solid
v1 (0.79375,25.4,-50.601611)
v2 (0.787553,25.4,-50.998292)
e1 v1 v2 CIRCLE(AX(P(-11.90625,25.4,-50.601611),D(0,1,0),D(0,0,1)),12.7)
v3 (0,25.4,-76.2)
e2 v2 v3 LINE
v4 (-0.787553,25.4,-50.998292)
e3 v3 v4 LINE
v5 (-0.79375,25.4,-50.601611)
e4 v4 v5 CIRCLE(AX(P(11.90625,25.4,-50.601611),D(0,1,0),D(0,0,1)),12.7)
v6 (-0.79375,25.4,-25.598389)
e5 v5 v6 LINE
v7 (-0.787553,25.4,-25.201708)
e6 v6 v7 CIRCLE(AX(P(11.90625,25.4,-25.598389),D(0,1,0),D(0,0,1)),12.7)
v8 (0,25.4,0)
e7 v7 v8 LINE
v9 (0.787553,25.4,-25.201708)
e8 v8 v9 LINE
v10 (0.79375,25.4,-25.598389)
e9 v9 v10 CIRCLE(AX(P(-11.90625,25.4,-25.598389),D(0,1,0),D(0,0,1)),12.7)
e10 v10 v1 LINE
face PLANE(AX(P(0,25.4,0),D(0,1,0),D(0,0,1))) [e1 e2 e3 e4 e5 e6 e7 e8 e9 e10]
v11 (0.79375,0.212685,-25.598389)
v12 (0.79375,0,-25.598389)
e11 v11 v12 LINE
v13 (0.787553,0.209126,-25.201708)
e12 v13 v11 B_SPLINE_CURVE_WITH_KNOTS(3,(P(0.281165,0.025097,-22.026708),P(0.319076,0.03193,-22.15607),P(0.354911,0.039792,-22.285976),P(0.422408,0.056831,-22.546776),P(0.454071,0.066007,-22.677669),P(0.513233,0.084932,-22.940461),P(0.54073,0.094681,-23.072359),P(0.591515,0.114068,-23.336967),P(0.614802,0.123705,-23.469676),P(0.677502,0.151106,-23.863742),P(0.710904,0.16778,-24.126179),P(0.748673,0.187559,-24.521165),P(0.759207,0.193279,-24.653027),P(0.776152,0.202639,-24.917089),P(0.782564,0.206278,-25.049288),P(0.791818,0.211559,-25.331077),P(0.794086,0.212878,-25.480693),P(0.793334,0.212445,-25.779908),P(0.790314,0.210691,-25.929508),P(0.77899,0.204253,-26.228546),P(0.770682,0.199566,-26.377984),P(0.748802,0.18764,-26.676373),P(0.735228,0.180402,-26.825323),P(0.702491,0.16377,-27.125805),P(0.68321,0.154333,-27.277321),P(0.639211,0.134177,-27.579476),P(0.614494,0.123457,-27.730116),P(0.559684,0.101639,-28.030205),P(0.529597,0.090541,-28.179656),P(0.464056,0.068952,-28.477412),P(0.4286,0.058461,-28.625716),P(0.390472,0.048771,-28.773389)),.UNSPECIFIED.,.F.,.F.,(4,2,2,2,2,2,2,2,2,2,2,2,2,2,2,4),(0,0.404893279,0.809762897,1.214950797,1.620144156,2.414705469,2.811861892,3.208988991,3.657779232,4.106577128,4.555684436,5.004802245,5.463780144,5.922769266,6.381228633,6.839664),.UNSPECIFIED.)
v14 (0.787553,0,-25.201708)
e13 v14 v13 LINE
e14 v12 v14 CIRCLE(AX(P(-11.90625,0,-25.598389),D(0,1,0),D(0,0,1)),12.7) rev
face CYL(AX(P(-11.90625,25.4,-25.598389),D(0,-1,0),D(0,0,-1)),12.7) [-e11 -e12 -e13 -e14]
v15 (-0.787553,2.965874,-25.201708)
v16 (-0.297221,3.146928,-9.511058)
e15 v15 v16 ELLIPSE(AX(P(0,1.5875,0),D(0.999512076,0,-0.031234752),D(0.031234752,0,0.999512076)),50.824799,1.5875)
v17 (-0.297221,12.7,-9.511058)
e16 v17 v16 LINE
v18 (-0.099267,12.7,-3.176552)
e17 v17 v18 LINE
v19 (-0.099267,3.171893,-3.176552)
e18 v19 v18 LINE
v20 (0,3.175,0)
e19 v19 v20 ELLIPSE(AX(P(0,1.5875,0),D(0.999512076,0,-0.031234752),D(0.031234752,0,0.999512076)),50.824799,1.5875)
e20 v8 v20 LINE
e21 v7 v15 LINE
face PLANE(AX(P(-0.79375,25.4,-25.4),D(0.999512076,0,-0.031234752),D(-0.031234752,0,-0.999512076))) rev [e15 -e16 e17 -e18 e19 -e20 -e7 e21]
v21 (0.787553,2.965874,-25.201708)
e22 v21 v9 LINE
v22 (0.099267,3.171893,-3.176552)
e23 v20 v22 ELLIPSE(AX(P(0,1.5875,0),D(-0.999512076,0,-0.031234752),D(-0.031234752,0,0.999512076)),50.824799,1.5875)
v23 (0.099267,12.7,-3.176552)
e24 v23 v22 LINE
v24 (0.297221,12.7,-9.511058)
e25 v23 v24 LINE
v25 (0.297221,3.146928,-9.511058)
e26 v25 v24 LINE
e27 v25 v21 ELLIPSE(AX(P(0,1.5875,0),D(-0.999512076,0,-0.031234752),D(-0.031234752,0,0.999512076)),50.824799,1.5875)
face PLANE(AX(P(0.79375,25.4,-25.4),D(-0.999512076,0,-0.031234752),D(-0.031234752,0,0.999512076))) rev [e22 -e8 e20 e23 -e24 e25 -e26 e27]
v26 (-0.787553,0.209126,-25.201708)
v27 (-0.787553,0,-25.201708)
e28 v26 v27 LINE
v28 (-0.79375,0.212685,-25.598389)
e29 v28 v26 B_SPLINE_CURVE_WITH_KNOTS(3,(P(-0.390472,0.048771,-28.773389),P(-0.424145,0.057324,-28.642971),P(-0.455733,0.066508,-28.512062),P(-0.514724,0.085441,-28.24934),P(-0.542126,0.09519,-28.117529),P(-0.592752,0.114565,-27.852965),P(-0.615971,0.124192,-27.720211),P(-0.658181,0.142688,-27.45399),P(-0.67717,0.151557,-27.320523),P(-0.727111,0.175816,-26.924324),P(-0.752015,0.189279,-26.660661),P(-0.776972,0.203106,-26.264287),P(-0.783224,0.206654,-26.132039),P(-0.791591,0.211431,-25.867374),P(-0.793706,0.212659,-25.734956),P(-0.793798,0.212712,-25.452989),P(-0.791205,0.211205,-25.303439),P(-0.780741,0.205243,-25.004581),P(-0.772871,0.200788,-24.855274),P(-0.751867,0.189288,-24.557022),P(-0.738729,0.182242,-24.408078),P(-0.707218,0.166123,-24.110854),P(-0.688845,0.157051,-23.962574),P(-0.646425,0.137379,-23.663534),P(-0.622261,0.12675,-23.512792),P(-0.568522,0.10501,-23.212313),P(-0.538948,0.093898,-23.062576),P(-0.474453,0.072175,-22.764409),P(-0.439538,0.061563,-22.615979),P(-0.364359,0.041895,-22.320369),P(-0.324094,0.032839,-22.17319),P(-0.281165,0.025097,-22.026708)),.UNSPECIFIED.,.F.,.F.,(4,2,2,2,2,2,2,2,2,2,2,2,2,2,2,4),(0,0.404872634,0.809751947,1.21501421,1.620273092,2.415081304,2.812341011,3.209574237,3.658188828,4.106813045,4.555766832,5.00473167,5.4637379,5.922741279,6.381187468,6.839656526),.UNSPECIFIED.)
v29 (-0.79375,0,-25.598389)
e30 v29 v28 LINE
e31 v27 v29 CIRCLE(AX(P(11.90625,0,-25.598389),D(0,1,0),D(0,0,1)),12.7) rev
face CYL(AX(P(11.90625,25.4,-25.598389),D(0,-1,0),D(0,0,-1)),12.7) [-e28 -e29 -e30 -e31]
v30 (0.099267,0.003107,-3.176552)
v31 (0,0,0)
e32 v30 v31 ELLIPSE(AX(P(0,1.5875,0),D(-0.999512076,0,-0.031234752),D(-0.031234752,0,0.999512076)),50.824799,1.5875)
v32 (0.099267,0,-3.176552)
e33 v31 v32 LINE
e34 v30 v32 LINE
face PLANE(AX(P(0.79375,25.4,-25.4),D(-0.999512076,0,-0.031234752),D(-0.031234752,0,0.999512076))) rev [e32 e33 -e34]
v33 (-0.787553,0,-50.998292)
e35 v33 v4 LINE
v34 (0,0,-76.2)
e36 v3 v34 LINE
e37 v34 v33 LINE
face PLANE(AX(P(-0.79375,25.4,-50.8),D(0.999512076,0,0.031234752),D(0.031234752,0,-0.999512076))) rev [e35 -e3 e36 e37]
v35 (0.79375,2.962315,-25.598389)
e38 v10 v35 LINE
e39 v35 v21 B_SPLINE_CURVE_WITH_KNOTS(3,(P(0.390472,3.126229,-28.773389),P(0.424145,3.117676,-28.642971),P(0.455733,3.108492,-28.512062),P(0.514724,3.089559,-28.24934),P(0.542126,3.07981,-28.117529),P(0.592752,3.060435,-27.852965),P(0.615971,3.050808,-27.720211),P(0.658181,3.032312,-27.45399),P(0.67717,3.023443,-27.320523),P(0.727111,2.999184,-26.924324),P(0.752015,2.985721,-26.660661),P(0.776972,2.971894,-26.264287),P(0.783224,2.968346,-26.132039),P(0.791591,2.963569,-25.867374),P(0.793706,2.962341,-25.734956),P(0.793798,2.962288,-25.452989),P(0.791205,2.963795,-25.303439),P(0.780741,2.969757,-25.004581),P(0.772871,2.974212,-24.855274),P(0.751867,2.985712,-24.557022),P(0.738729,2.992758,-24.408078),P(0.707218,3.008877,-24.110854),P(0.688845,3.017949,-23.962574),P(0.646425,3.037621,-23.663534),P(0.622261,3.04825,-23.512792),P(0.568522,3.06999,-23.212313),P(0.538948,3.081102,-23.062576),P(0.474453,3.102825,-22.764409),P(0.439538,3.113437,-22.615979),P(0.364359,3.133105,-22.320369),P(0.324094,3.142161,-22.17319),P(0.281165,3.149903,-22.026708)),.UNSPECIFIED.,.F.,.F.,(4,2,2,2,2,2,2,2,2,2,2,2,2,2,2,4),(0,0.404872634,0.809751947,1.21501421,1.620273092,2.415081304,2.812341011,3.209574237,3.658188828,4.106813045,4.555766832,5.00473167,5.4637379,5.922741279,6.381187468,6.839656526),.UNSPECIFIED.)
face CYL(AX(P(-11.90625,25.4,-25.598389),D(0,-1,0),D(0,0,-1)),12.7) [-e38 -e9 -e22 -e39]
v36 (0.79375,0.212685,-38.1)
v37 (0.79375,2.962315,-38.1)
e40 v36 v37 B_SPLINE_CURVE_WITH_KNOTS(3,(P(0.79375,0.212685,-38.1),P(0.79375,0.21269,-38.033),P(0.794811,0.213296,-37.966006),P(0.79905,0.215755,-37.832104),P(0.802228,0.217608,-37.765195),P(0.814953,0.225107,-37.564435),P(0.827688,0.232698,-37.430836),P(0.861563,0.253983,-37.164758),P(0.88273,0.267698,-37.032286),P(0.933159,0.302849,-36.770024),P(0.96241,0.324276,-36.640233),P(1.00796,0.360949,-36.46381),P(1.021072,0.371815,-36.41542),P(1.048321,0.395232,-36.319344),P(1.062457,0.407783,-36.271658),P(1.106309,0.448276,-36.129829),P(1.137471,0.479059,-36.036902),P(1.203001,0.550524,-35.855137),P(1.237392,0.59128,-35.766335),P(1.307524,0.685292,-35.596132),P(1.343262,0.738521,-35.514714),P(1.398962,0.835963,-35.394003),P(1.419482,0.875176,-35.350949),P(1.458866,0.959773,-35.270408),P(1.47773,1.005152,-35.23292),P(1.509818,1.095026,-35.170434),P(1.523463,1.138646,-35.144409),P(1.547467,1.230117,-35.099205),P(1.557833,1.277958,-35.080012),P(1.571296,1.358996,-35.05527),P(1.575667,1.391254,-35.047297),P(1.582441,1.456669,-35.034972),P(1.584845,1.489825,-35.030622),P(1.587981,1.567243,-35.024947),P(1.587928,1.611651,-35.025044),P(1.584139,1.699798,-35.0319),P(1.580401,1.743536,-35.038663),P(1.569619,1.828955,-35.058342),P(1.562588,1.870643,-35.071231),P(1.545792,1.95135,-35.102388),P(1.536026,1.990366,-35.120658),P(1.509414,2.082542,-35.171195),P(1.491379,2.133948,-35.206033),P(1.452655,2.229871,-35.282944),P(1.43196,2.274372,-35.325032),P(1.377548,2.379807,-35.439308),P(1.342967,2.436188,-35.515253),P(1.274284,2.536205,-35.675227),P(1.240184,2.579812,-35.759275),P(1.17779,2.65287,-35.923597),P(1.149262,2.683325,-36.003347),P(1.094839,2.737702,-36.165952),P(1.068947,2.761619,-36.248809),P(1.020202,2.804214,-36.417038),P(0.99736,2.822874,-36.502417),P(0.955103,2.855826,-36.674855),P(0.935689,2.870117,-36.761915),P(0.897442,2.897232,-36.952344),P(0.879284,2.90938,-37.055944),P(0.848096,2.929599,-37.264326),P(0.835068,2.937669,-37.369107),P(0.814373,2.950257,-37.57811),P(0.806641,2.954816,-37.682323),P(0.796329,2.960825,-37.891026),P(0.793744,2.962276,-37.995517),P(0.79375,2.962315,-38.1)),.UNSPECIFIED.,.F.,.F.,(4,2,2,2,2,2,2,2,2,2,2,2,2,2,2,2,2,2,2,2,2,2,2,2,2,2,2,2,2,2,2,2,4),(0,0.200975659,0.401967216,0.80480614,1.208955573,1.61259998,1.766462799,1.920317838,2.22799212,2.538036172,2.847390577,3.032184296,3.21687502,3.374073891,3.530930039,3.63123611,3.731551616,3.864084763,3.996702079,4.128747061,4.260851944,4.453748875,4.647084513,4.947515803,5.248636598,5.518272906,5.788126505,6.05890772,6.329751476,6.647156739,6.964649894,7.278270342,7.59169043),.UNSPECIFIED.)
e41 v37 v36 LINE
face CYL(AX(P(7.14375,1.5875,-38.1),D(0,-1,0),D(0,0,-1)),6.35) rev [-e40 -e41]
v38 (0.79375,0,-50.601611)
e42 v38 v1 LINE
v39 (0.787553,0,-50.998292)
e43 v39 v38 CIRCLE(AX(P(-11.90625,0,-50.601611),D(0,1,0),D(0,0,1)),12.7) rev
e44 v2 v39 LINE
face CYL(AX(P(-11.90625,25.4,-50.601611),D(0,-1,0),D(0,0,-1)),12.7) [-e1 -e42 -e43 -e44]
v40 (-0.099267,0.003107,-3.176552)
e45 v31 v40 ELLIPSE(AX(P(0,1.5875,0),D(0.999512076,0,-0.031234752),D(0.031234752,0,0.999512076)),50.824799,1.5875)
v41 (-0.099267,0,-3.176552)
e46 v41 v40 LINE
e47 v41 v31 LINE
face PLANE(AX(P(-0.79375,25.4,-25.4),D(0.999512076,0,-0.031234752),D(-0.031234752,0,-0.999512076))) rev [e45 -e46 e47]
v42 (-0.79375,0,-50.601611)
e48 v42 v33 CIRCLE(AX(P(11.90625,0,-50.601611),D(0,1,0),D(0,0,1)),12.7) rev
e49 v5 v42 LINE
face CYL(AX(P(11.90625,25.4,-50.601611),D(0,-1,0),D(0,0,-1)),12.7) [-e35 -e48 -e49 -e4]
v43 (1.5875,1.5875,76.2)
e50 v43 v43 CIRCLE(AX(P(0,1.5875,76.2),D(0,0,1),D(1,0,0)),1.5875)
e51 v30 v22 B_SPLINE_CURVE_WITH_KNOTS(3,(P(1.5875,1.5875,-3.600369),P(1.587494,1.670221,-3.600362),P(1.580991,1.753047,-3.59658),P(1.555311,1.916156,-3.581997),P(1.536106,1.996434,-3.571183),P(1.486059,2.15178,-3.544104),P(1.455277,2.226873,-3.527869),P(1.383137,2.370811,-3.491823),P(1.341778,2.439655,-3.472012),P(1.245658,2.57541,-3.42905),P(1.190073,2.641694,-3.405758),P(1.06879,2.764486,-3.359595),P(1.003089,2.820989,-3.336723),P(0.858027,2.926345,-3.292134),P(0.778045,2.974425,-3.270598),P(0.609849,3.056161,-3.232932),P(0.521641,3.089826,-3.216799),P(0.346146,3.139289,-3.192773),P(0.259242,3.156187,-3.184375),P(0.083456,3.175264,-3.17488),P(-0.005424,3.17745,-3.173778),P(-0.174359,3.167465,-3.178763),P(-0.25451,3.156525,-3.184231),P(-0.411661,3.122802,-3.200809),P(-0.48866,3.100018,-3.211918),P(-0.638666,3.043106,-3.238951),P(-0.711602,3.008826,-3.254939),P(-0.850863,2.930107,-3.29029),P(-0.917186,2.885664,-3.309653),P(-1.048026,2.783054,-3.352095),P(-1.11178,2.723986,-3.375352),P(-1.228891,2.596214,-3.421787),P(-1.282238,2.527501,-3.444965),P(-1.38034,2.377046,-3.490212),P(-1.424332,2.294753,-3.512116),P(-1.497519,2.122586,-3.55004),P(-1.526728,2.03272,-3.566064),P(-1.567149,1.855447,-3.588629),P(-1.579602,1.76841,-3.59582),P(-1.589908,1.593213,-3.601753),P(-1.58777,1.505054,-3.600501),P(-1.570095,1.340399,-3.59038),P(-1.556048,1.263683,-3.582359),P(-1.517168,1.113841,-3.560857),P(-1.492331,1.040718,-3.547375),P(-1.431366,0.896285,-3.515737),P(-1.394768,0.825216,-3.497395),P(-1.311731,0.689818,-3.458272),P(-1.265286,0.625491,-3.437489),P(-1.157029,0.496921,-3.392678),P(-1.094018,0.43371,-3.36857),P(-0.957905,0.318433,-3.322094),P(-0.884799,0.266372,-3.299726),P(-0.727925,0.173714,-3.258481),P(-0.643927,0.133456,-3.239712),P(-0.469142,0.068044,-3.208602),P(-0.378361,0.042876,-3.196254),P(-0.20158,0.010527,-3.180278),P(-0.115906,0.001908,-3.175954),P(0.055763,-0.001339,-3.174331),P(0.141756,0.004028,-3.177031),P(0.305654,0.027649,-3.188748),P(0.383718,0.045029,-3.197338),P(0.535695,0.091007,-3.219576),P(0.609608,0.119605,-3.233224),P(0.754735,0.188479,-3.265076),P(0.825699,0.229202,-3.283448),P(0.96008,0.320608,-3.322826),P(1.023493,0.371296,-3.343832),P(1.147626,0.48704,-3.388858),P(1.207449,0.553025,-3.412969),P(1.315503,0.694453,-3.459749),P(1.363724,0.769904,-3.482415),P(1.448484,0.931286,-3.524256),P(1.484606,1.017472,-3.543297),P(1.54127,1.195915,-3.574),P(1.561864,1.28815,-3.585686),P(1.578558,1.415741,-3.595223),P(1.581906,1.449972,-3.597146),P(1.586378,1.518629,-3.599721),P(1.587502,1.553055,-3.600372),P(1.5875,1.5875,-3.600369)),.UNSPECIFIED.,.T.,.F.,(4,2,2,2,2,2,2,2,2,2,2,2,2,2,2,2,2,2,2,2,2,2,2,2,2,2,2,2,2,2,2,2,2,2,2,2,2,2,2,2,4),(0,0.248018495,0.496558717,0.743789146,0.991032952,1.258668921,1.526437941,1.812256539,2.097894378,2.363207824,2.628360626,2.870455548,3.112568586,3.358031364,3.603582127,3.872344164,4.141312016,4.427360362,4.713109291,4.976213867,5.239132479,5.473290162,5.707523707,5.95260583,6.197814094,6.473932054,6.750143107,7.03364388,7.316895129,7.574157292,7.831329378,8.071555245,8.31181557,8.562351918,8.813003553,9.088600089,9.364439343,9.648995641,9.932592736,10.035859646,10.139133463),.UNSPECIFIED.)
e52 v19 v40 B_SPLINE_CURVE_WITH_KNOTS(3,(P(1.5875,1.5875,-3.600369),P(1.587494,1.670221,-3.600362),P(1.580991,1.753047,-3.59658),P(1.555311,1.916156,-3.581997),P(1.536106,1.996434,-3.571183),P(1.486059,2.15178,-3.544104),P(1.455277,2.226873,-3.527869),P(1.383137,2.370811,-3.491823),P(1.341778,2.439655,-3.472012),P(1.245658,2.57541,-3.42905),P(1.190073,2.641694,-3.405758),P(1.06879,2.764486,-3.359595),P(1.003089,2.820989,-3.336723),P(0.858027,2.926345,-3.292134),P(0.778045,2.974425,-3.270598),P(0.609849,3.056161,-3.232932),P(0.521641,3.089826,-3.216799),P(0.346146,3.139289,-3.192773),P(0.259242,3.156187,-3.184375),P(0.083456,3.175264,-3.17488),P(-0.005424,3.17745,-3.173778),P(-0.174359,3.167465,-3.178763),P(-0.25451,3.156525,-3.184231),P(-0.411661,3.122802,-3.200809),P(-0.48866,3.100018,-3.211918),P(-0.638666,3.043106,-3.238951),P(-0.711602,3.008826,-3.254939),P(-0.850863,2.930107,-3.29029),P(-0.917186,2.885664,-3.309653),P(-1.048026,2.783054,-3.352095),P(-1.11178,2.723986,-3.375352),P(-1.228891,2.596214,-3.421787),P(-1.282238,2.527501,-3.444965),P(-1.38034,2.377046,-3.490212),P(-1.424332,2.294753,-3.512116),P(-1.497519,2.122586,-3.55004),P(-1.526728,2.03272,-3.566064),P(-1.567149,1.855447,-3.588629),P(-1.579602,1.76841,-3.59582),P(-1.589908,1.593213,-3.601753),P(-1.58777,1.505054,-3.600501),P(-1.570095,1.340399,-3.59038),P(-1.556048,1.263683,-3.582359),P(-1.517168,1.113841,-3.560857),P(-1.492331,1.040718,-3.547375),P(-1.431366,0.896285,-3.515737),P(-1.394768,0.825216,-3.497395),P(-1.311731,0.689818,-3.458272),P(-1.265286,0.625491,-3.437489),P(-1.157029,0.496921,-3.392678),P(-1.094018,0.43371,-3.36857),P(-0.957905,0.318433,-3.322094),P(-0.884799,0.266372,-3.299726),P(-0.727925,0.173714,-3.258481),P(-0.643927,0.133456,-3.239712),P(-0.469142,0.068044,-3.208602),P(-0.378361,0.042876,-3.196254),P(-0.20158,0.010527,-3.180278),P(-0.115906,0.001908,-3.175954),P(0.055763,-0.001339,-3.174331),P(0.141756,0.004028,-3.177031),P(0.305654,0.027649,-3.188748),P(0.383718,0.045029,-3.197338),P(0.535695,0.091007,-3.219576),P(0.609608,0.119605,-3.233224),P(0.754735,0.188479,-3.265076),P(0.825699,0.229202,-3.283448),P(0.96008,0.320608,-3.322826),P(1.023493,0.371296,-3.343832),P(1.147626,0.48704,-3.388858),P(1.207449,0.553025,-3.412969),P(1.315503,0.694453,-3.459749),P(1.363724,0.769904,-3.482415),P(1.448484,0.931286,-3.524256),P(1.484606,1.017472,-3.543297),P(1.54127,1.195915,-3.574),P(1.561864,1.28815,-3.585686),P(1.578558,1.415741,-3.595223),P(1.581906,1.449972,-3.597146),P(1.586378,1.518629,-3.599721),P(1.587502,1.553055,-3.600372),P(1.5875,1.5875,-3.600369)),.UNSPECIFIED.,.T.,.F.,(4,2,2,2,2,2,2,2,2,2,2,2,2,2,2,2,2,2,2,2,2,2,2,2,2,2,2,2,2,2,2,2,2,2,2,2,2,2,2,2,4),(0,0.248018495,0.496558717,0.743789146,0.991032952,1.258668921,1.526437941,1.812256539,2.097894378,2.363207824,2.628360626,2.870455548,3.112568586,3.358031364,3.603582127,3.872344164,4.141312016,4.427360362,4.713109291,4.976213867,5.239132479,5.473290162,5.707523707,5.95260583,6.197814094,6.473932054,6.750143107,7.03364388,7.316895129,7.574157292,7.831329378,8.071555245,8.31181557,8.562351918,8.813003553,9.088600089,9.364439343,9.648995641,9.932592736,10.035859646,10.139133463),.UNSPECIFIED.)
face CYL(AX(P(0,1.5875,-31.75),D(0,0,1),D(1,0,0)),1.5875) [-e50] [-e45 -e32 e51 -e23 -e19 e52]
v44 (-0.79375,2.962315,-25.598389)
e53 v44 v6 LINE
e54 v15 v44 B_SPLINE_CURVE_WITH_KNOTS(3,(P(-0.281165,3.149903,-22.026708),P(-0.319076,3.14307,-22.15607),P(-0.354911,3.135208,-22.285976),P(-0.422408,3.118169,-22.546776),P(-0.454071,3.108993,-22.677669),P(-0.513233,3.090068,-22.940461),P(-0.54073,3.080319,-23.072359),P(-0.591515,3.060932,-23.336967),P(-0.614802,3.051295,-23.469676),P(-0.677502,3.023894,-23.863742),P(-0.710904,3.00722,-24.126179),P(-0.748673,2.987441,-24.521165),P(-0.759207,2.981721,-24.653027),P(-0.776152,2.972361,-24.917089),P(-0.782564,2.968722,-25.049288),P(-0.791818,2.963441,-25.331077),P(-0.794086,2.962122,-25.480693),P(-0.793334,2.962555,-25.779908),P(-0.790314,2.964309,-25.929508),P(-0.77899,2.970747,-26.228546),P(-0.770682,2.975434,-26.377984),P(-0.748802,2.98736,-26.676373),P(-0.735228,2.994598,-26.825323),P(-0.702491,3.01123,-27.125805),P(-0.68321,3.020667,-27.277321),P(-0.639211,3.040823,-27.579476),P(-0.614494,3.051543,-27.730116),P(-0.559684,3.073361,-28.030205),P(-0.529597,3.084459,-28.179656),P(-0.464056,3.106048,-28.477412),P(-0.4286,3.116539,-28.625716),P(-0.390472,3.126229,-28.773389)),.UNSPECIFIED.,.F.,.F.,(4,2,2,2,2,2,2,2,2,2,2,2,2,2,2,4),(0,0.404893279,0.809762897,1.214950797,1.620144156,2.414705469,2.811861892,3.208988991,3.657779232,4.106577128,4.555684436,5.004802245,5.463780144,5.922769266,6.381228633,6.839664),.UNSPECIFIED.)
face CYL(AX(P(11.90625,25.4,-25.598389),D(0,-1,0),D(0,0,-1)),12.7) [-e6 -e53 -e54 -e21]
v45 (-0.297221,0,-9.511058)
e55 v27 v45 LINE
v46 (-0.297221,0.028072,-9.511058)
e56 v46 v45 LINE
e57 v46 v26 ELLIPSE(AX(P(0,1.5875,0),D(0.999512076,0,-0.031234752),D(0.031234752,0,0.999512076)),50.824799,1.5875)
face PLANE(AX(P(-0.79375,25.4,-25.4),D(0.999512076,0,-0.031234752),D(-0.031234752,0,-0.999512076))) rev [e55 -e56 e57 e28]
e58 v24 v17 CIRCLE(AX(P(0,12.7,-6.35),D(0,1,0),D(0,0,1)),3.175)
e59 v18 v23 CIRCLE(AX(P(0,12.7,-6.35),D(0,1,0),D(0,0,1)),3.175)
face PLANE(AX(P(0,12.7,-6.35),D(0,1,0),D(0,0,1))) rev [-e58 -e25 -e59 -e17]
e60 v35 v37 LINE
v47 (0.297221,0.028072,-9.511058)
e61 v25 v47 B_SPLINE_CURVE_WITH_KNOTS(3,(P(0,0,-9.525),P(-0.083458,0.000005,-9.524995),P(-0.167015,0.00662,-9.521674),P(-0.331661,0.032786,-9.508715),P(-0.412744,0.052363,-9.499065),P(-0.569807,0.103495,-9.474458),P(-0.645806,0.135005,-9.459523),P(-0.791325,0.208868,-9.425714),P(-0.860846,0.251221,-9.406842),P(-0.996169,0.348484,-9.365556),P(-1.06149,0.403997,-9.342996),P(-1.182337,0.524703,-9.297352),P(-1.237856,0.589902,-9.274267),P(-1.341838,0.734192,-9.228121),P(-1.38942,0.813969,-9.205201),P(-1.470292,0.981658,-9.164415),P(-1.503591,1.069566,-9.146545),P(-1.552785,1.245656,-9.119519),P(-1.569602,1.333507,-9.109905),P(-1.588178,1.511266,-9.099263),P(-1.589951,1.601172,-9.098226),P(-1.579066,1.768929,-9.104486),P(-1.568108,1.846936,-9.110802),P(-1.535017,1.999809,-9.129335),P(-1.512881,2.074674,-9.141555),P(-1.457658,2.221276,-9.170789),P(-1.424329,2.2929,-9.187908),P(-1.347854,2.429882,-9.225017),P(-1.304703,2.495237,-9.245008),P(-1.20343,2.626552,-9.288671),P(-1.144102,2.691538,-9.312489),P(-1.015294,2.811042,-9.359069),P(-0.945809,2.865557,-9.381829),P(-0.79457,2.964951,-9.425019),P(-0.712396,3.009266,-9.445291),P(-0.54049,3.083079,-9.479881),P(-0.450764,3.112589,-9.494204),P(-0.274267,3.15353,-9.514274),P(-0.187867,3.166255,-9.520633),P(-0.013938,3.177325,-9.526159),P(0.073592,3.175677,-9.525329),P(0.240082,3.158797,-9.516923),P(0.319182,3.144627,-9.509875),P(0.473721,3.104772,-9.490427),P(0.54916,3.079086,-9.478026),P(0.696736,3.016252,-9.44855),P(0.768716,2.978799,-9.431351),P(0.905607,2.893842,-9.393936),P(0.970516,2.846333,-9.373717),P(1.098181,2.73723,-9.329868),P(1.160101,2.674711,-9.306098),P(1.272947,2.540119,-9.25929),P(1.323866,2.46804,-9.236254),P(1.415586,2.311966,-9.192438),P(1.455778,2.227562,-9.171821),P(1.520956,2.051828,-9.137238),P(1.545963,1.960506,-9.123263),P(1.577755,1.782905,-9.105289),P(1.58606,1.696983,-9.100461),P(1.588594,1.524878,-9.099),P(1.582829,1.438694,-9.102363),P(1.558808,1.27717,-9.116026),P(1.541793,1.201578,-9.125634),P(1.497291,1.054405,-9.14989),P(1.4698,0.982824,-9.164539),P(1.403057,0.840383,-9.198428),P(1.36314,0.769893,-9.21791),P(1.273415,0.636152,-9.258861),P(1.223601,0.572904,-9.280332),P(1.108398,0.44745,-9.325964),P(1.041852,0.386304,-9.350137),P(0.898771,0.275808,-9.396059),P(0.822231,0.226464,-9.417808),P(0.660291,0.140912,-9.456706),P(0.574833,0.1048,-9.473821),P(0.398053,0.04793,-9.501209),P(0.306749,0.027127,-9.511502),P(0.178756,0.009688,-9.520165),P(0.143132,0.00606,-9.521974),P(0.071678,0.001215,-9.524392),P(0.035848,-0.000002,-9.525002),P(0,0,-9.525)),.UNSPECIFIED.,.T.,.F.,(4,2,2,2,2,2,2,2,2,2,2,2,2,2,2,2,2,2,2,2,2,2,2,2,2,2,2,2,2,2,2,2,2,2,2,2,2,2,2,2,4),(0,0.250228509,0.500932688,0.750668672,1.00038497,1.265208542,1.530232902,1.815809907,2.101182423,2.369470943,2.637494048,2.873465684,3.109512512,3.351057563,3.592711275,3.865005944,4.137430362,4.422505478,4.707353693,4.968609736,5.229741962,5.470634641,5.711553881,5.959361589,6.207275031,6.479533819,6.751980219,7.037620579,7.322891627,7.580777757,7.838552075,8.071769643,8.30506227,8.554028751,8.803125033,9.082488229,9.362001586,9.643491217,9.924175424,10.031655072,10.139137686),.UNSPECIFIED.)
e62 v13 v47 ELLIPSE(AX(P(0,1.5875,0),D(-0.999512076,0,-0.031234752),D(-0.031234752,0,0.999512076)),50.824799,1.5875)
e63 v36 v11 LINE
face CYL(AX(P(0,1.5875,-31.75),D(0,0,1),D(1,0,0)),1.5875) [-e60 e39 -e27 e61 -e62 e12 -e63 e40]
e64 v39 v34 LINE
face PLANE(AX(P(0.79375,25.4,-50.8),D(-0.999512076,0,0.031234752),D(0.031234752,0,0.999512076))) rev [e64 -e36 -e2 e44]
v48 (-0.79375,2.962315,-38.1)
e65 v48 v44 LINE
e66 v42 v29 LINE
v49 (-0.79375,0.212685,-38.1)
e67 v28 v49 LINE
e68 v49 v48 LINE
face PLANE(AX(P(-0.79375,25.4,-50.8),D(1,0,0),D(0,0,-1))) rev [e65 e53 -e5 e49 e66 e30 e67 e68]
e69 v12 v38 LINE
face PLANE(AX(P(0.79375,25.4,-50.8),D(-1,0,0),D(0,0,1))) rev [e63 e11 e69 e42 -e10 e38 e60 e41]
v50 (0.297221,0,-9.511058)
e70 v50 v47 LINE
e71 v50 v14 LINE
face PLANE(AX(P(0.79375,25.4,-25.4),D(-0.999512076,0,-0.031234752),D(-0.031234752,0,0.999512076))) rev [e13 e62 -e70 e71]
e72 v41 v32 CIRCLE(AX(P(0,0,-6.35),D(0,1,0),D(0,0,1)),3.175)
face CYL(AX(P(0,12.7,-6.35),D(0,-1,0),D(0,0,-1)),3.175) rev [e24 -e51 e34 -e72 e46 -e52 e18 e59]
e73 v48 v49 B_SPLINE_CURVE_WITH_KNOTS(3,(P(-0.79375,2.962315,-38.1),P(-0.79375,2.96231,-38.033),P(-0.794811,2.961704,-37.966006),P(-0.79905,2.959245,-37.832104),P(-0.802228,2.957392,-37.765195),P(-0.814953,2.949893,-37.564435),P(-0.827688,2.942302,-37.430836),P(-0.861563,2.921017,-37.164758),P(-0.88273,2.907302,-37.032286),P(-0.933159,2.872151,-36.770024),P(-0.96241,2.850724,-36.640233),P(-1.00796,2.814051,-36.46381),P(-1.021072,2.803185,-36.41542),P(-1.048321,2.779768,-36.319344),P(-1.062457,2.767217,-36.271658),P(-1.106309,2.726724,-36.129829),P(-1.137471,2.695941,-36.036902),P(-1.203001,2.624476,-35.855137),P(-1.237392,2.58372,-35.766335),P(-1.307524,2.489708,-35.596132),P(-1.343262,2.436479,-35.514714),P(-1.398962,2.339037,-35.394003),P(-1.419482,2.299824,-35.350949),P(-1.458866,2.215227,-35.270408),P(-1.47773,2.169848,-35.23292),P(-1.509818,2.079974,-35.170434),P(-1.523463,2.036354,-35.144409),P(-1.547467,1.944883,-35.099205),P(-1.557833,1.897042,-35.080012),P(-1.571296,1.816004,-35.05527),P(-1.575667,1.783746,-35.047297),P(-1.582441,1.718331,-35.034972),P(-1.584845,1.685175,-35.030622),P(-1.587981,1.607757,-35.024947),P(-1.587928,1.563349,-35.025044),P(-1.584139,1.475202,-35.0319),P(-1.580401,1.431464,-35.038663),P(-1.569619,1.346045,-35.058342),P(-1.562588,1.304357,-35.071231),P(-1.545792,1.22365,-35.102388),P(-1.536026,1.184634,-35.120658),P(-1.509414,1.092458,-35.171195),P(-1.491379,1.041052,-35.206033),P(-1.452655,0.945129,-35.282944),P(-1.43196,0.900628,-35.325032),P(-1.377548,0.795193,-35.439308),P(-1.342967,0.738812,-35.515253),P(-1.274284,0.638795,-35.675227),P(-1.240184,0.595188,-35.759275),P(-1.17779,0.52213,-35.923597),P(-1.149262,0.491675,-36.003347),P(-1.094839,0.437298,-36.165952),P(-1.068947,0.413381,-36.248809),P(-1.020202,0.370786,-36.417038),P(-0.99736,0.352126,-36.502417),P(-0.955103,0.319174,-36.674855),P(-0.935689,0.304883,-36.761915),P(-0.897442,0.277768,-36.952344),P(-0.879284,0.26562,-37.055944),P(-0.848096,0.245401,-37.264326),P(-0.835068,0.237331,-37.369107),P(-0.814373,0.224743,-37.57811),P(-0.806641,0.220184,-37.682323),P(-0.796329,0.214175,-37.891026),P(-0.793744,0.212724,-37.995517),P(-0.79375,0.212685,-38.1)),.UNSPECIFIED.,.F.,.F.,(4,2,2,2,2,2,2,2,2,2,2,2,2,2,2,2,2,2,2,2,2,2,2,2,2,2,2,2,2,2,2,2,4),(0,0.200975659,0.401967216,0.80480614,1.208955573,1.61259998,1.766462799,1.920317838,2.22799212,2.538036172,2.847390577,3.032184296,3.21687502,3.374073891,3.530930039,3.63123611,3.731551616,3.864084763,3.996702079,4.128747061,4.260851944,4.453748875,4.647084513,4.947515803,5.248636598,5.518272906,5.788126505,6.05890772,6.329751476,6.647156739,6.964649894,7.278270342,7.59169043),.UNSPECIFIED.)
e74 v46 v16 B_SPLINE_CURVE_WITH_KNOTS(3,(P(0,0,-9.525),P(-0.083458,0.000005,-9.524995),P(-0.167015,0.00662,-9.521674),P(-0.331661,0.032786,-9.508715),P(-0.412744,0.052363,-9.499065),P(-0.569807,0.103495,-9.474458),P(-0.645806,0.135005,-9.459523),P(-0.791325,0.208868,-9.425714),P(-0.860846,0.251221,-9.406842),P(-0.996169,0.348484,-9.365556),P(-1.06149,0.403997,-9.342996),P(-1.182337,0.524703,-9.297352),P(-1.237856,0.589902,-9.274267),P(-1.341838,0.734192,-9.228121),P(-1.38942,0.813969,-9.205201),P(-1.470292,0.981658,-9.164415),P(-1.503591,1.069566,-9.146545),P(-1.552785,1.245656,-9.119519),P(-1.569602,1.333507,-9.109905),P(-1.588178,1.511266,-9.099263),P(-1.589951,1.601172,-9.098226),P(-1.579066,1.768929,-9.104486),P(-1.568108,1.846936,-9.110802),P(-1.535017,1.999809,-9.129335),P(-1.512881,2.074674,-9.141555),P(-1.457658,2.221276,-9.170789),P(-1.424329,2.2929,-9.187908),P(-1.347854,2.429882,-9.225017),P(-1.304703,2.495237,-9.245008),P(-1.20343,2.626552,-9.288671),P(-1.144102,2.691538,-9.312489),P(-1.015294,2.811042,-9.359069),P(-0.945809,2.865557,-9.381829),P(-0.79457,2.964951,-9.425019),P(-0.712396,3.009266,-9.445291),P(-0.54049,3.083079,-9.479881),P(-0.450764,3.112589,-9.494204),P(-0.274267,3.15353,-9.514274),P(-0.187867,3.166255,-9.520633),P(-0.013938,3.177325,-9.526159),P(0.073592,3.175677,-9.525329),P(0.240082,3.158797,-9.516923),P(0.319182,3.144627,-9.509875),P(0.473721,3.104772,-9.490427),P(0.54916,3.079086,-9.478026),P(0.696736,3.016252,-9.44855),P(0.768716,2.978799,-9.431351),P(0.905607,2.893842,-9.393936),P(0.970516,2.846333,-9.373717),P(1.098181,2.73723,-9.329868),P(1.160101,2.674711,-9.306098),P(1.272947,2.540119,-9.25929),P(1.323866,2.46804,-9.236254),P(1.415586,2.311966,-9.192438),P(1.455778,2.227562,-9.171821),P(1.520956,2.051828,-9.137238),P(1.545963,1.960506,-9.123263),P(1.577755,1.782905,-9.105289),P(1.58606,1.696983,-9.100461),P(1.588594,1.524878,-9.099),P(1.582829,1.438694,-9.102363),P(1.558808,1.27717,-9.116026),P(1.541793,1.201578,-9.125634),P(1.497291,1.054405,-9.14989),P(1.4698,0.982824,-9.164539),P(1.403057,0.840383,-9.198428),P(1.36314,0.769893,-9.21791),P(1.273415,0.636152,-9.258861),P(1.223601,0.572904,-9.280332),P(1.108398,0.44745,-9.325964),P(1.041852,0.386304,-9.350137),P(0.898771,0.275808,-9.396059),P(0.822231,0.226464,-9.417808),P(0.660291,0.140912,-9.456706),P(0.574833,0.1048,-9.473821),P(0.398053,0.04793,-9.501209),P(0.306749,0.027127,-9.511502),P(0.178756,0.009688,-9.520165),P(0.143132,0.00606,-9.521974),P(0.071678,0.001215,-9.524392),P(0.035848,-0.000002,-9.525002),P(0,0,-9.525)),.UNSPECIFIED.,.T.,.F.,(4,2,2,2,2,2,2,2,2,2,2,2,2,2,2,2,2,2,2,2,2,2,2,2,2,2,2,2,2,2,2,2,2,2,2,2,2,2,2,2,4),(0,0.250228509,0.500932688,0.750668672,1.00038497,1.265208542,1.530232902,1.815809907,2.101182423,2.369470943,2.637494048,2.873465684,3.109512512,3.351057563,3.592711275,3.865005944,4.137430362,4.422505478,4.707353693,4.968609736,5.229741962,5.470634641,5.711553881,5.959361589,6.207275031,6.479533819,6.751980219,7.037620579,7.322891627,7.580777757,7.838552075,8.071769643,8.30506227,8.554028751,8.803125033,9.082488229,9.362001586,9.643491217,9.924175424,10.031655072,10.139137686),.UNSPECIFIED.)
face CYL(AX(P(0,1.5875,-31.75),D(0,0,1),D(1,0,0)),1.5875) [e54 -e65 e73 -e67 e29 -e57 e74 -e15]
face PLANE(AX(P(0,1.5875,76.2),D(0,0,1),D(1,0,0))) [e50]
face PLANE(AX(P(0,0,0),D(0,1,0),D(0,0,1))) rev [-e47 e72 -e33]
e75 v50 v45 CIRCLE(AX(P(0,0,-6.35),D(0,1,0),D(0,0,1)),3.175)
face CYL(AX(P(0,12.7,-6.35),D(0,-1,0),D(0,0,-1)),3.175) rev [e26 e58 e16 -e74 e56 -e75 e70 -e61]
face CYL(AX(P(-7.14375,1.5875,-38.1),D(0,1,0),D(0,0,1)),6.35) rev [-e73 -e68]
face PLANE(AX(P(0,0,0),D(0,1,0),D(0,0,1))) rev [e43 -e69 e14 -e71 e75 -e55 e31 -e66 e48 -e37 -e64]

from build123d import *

# Parameters (mm, degrees)
BOSS_EXTRUDE1_DEPTH      = 25.4
FILLET1_R                = 12.7
BOSS_EXTRUDE2_DEPTH      = 76.2
BOSS_EXTRUDE2_DEPTH_BACK = 31.75
SKETCH3_R                = 1.5875
FILLET2_R                = 6.35
SKETCH4_R                = 3.175
CUT_EXTRUDE2_DEPTH       = 12.7


with BuildPart() as part:
    # Sketch1 → Boss-Extrude1 (new body)
    with BuildSketch(Plane(origin=(0, 0, 0), x_dir=(1, 0, 0), z_dir=(0, 1, 0))):
        Polygon((-0.79375, 50.8), (-0.79375, 25.4), (0, 0), (0.79375, 25.4), (0.79375, 50.8), (0, 76.2), align=None)
    extrude(amount=BOSS_EXTRUDE1_DEPTH)

    # Fillet1
    # the kernel refuses this fillet: 12.7 mm, written as the material it takes off along each edge
    with BuildSketch(Plane(origin=(-0.79375, -0.495972692, -25.4), x_dir=(0, 0, -1), z_dir=(0, 1, 0)), Plane(origin=(0.79375, -0.495972692, -50.8), x_dir=(0, 0, 1), z_dir=(0, 1, 0)), Plane(origin=(0.79375, -0.495972692, -25.4), x_dir=(-0.031234752377718417, 0, 0.9995120760870789), z_dir=(0, 1, 0))) as fillet1_piece_1:
        with BuildLine():
            CenterArc((FILLET1_R * 0.0156211871642, -FILLET1_R), FILLET1_R, 90, 1.789910608)
            Line((-FILLET1_R * 0.0156135652135, -FILLET1_R * 0.000487923912921), (0, 0))
            Line((0, 0), (FILLET1_R * 0.0156211871642, 0))
        make_face()
    extrude(amount=26.391945385, mode=Mode.SUBTRACT)
    with BuildSketch(Plane(origin=(-0.79375, -0.495972692, -50.8), x_dir=(0, 0, 1), z_dir=(0, 1, 0))) as fillet1_piece_2:
        with BuildLine():
            CenterArc((FILLET1_R * 0.0156211871642, FILLET1_R), FILLET1_R, 268.210089392, 1.789910608)
            Line((-FILLET1_R * 0.0156135652135, FILLET1_R * 0.000487923912921), (0, 0))
            Line((0, 0), (FILLET1_R * 0.0156211871642, 0))
        make_face()
    extrude(amount=26.391945385, mode=Mode.SUBTRACT)

    # Sketch3 → Boss-Extrude2 (add, two sides: drawn at the far end of the back side and taken through both)
    with BuildSketch(Plane.XY.offset(-BOSS_EXTRUDE2_DEPTH_BACK)):
        with Locations((0, 1.5875)):
            Circle(SKETCH3_R)
    extrude(amount=BOSS_EXTRUDE2_DEPTH + BOSS_EXTRUDE2_DEPTH_BACK)

    # Fillet2
    # the kernel refuses this fillet: 6.35 mm, written as the material it adds along each edge
    with BuildSketch(Plane(origin=(-0.79375, 18.837315329, -31.75), x_dir=(0, 0, -1), z_dir=(0, -1, 0))) as fillet2_piece_1_section:
        with BuildLine():
            CenterArc((FILLET2_R, -FILLET2_R), FILLET2_R, 90, 90)
            Line((0, -FILLET2_R), (0, 0))
            Line((0, 0), (FILLET2_R, 0))
        make_face()
    fillet2_piece_1 = extrude(amount=34.499630657, mode=Mode.PRIVATE)
    fillet2_piece_1 = fillet2_piece_1 & Plane(origin=(0, 1.5875, -34.046856279), x_dir=(1, 0, 0), z_dir=(0, 0, 1)) * Cylinder(1.5875, 95, mode=Mode.PRIVATE)
    add(fillet2_piece_1)
    with BuildSketch(Plane(origin=(0.79375, -15.662315329, -31.75), x_dir=(0, 0, -1), z_dir=(0, 1, 0))) as fillet2_piece_2_section:
        with BuildLine():
            CenterArc((FILLET2_R, -FILLET2_R), FILLET2_R, 90, 90)
            Line((0, -FILLET2_R), (0, 0))
            Line((0, 0), (FILLET2_R, 0))
        make_face()
    fillet2_piece_2 = extrude(amount=34.499630657, mode=Mode.PRIVATE)
    fillet2_piece_2 = fillet2_piece_2 & Plane(origin=(0, 1.5875, -34.046857324), x_dir=(1, 0, 0), z_dir=(0, 0, 1)) * Cylinder(1.5875, 95, mode=Mode.PRIVATE)
    add(fillet2_piece_2)

    # Sketch4 → Cut-Extrude2 (cut)
    with BuildSketch(Plane(origin=(0, 0, 0), x_dir=(1, 0, 0), z_dir=(0, 1, 0))):
        with Locations((0, 6.35)):
            Circle(SKETCH4_R)
    extrude(amount=CUT_EXTRUDE2_DEPTH, mode=Mode.SUBTRACT)


solid = part.part
